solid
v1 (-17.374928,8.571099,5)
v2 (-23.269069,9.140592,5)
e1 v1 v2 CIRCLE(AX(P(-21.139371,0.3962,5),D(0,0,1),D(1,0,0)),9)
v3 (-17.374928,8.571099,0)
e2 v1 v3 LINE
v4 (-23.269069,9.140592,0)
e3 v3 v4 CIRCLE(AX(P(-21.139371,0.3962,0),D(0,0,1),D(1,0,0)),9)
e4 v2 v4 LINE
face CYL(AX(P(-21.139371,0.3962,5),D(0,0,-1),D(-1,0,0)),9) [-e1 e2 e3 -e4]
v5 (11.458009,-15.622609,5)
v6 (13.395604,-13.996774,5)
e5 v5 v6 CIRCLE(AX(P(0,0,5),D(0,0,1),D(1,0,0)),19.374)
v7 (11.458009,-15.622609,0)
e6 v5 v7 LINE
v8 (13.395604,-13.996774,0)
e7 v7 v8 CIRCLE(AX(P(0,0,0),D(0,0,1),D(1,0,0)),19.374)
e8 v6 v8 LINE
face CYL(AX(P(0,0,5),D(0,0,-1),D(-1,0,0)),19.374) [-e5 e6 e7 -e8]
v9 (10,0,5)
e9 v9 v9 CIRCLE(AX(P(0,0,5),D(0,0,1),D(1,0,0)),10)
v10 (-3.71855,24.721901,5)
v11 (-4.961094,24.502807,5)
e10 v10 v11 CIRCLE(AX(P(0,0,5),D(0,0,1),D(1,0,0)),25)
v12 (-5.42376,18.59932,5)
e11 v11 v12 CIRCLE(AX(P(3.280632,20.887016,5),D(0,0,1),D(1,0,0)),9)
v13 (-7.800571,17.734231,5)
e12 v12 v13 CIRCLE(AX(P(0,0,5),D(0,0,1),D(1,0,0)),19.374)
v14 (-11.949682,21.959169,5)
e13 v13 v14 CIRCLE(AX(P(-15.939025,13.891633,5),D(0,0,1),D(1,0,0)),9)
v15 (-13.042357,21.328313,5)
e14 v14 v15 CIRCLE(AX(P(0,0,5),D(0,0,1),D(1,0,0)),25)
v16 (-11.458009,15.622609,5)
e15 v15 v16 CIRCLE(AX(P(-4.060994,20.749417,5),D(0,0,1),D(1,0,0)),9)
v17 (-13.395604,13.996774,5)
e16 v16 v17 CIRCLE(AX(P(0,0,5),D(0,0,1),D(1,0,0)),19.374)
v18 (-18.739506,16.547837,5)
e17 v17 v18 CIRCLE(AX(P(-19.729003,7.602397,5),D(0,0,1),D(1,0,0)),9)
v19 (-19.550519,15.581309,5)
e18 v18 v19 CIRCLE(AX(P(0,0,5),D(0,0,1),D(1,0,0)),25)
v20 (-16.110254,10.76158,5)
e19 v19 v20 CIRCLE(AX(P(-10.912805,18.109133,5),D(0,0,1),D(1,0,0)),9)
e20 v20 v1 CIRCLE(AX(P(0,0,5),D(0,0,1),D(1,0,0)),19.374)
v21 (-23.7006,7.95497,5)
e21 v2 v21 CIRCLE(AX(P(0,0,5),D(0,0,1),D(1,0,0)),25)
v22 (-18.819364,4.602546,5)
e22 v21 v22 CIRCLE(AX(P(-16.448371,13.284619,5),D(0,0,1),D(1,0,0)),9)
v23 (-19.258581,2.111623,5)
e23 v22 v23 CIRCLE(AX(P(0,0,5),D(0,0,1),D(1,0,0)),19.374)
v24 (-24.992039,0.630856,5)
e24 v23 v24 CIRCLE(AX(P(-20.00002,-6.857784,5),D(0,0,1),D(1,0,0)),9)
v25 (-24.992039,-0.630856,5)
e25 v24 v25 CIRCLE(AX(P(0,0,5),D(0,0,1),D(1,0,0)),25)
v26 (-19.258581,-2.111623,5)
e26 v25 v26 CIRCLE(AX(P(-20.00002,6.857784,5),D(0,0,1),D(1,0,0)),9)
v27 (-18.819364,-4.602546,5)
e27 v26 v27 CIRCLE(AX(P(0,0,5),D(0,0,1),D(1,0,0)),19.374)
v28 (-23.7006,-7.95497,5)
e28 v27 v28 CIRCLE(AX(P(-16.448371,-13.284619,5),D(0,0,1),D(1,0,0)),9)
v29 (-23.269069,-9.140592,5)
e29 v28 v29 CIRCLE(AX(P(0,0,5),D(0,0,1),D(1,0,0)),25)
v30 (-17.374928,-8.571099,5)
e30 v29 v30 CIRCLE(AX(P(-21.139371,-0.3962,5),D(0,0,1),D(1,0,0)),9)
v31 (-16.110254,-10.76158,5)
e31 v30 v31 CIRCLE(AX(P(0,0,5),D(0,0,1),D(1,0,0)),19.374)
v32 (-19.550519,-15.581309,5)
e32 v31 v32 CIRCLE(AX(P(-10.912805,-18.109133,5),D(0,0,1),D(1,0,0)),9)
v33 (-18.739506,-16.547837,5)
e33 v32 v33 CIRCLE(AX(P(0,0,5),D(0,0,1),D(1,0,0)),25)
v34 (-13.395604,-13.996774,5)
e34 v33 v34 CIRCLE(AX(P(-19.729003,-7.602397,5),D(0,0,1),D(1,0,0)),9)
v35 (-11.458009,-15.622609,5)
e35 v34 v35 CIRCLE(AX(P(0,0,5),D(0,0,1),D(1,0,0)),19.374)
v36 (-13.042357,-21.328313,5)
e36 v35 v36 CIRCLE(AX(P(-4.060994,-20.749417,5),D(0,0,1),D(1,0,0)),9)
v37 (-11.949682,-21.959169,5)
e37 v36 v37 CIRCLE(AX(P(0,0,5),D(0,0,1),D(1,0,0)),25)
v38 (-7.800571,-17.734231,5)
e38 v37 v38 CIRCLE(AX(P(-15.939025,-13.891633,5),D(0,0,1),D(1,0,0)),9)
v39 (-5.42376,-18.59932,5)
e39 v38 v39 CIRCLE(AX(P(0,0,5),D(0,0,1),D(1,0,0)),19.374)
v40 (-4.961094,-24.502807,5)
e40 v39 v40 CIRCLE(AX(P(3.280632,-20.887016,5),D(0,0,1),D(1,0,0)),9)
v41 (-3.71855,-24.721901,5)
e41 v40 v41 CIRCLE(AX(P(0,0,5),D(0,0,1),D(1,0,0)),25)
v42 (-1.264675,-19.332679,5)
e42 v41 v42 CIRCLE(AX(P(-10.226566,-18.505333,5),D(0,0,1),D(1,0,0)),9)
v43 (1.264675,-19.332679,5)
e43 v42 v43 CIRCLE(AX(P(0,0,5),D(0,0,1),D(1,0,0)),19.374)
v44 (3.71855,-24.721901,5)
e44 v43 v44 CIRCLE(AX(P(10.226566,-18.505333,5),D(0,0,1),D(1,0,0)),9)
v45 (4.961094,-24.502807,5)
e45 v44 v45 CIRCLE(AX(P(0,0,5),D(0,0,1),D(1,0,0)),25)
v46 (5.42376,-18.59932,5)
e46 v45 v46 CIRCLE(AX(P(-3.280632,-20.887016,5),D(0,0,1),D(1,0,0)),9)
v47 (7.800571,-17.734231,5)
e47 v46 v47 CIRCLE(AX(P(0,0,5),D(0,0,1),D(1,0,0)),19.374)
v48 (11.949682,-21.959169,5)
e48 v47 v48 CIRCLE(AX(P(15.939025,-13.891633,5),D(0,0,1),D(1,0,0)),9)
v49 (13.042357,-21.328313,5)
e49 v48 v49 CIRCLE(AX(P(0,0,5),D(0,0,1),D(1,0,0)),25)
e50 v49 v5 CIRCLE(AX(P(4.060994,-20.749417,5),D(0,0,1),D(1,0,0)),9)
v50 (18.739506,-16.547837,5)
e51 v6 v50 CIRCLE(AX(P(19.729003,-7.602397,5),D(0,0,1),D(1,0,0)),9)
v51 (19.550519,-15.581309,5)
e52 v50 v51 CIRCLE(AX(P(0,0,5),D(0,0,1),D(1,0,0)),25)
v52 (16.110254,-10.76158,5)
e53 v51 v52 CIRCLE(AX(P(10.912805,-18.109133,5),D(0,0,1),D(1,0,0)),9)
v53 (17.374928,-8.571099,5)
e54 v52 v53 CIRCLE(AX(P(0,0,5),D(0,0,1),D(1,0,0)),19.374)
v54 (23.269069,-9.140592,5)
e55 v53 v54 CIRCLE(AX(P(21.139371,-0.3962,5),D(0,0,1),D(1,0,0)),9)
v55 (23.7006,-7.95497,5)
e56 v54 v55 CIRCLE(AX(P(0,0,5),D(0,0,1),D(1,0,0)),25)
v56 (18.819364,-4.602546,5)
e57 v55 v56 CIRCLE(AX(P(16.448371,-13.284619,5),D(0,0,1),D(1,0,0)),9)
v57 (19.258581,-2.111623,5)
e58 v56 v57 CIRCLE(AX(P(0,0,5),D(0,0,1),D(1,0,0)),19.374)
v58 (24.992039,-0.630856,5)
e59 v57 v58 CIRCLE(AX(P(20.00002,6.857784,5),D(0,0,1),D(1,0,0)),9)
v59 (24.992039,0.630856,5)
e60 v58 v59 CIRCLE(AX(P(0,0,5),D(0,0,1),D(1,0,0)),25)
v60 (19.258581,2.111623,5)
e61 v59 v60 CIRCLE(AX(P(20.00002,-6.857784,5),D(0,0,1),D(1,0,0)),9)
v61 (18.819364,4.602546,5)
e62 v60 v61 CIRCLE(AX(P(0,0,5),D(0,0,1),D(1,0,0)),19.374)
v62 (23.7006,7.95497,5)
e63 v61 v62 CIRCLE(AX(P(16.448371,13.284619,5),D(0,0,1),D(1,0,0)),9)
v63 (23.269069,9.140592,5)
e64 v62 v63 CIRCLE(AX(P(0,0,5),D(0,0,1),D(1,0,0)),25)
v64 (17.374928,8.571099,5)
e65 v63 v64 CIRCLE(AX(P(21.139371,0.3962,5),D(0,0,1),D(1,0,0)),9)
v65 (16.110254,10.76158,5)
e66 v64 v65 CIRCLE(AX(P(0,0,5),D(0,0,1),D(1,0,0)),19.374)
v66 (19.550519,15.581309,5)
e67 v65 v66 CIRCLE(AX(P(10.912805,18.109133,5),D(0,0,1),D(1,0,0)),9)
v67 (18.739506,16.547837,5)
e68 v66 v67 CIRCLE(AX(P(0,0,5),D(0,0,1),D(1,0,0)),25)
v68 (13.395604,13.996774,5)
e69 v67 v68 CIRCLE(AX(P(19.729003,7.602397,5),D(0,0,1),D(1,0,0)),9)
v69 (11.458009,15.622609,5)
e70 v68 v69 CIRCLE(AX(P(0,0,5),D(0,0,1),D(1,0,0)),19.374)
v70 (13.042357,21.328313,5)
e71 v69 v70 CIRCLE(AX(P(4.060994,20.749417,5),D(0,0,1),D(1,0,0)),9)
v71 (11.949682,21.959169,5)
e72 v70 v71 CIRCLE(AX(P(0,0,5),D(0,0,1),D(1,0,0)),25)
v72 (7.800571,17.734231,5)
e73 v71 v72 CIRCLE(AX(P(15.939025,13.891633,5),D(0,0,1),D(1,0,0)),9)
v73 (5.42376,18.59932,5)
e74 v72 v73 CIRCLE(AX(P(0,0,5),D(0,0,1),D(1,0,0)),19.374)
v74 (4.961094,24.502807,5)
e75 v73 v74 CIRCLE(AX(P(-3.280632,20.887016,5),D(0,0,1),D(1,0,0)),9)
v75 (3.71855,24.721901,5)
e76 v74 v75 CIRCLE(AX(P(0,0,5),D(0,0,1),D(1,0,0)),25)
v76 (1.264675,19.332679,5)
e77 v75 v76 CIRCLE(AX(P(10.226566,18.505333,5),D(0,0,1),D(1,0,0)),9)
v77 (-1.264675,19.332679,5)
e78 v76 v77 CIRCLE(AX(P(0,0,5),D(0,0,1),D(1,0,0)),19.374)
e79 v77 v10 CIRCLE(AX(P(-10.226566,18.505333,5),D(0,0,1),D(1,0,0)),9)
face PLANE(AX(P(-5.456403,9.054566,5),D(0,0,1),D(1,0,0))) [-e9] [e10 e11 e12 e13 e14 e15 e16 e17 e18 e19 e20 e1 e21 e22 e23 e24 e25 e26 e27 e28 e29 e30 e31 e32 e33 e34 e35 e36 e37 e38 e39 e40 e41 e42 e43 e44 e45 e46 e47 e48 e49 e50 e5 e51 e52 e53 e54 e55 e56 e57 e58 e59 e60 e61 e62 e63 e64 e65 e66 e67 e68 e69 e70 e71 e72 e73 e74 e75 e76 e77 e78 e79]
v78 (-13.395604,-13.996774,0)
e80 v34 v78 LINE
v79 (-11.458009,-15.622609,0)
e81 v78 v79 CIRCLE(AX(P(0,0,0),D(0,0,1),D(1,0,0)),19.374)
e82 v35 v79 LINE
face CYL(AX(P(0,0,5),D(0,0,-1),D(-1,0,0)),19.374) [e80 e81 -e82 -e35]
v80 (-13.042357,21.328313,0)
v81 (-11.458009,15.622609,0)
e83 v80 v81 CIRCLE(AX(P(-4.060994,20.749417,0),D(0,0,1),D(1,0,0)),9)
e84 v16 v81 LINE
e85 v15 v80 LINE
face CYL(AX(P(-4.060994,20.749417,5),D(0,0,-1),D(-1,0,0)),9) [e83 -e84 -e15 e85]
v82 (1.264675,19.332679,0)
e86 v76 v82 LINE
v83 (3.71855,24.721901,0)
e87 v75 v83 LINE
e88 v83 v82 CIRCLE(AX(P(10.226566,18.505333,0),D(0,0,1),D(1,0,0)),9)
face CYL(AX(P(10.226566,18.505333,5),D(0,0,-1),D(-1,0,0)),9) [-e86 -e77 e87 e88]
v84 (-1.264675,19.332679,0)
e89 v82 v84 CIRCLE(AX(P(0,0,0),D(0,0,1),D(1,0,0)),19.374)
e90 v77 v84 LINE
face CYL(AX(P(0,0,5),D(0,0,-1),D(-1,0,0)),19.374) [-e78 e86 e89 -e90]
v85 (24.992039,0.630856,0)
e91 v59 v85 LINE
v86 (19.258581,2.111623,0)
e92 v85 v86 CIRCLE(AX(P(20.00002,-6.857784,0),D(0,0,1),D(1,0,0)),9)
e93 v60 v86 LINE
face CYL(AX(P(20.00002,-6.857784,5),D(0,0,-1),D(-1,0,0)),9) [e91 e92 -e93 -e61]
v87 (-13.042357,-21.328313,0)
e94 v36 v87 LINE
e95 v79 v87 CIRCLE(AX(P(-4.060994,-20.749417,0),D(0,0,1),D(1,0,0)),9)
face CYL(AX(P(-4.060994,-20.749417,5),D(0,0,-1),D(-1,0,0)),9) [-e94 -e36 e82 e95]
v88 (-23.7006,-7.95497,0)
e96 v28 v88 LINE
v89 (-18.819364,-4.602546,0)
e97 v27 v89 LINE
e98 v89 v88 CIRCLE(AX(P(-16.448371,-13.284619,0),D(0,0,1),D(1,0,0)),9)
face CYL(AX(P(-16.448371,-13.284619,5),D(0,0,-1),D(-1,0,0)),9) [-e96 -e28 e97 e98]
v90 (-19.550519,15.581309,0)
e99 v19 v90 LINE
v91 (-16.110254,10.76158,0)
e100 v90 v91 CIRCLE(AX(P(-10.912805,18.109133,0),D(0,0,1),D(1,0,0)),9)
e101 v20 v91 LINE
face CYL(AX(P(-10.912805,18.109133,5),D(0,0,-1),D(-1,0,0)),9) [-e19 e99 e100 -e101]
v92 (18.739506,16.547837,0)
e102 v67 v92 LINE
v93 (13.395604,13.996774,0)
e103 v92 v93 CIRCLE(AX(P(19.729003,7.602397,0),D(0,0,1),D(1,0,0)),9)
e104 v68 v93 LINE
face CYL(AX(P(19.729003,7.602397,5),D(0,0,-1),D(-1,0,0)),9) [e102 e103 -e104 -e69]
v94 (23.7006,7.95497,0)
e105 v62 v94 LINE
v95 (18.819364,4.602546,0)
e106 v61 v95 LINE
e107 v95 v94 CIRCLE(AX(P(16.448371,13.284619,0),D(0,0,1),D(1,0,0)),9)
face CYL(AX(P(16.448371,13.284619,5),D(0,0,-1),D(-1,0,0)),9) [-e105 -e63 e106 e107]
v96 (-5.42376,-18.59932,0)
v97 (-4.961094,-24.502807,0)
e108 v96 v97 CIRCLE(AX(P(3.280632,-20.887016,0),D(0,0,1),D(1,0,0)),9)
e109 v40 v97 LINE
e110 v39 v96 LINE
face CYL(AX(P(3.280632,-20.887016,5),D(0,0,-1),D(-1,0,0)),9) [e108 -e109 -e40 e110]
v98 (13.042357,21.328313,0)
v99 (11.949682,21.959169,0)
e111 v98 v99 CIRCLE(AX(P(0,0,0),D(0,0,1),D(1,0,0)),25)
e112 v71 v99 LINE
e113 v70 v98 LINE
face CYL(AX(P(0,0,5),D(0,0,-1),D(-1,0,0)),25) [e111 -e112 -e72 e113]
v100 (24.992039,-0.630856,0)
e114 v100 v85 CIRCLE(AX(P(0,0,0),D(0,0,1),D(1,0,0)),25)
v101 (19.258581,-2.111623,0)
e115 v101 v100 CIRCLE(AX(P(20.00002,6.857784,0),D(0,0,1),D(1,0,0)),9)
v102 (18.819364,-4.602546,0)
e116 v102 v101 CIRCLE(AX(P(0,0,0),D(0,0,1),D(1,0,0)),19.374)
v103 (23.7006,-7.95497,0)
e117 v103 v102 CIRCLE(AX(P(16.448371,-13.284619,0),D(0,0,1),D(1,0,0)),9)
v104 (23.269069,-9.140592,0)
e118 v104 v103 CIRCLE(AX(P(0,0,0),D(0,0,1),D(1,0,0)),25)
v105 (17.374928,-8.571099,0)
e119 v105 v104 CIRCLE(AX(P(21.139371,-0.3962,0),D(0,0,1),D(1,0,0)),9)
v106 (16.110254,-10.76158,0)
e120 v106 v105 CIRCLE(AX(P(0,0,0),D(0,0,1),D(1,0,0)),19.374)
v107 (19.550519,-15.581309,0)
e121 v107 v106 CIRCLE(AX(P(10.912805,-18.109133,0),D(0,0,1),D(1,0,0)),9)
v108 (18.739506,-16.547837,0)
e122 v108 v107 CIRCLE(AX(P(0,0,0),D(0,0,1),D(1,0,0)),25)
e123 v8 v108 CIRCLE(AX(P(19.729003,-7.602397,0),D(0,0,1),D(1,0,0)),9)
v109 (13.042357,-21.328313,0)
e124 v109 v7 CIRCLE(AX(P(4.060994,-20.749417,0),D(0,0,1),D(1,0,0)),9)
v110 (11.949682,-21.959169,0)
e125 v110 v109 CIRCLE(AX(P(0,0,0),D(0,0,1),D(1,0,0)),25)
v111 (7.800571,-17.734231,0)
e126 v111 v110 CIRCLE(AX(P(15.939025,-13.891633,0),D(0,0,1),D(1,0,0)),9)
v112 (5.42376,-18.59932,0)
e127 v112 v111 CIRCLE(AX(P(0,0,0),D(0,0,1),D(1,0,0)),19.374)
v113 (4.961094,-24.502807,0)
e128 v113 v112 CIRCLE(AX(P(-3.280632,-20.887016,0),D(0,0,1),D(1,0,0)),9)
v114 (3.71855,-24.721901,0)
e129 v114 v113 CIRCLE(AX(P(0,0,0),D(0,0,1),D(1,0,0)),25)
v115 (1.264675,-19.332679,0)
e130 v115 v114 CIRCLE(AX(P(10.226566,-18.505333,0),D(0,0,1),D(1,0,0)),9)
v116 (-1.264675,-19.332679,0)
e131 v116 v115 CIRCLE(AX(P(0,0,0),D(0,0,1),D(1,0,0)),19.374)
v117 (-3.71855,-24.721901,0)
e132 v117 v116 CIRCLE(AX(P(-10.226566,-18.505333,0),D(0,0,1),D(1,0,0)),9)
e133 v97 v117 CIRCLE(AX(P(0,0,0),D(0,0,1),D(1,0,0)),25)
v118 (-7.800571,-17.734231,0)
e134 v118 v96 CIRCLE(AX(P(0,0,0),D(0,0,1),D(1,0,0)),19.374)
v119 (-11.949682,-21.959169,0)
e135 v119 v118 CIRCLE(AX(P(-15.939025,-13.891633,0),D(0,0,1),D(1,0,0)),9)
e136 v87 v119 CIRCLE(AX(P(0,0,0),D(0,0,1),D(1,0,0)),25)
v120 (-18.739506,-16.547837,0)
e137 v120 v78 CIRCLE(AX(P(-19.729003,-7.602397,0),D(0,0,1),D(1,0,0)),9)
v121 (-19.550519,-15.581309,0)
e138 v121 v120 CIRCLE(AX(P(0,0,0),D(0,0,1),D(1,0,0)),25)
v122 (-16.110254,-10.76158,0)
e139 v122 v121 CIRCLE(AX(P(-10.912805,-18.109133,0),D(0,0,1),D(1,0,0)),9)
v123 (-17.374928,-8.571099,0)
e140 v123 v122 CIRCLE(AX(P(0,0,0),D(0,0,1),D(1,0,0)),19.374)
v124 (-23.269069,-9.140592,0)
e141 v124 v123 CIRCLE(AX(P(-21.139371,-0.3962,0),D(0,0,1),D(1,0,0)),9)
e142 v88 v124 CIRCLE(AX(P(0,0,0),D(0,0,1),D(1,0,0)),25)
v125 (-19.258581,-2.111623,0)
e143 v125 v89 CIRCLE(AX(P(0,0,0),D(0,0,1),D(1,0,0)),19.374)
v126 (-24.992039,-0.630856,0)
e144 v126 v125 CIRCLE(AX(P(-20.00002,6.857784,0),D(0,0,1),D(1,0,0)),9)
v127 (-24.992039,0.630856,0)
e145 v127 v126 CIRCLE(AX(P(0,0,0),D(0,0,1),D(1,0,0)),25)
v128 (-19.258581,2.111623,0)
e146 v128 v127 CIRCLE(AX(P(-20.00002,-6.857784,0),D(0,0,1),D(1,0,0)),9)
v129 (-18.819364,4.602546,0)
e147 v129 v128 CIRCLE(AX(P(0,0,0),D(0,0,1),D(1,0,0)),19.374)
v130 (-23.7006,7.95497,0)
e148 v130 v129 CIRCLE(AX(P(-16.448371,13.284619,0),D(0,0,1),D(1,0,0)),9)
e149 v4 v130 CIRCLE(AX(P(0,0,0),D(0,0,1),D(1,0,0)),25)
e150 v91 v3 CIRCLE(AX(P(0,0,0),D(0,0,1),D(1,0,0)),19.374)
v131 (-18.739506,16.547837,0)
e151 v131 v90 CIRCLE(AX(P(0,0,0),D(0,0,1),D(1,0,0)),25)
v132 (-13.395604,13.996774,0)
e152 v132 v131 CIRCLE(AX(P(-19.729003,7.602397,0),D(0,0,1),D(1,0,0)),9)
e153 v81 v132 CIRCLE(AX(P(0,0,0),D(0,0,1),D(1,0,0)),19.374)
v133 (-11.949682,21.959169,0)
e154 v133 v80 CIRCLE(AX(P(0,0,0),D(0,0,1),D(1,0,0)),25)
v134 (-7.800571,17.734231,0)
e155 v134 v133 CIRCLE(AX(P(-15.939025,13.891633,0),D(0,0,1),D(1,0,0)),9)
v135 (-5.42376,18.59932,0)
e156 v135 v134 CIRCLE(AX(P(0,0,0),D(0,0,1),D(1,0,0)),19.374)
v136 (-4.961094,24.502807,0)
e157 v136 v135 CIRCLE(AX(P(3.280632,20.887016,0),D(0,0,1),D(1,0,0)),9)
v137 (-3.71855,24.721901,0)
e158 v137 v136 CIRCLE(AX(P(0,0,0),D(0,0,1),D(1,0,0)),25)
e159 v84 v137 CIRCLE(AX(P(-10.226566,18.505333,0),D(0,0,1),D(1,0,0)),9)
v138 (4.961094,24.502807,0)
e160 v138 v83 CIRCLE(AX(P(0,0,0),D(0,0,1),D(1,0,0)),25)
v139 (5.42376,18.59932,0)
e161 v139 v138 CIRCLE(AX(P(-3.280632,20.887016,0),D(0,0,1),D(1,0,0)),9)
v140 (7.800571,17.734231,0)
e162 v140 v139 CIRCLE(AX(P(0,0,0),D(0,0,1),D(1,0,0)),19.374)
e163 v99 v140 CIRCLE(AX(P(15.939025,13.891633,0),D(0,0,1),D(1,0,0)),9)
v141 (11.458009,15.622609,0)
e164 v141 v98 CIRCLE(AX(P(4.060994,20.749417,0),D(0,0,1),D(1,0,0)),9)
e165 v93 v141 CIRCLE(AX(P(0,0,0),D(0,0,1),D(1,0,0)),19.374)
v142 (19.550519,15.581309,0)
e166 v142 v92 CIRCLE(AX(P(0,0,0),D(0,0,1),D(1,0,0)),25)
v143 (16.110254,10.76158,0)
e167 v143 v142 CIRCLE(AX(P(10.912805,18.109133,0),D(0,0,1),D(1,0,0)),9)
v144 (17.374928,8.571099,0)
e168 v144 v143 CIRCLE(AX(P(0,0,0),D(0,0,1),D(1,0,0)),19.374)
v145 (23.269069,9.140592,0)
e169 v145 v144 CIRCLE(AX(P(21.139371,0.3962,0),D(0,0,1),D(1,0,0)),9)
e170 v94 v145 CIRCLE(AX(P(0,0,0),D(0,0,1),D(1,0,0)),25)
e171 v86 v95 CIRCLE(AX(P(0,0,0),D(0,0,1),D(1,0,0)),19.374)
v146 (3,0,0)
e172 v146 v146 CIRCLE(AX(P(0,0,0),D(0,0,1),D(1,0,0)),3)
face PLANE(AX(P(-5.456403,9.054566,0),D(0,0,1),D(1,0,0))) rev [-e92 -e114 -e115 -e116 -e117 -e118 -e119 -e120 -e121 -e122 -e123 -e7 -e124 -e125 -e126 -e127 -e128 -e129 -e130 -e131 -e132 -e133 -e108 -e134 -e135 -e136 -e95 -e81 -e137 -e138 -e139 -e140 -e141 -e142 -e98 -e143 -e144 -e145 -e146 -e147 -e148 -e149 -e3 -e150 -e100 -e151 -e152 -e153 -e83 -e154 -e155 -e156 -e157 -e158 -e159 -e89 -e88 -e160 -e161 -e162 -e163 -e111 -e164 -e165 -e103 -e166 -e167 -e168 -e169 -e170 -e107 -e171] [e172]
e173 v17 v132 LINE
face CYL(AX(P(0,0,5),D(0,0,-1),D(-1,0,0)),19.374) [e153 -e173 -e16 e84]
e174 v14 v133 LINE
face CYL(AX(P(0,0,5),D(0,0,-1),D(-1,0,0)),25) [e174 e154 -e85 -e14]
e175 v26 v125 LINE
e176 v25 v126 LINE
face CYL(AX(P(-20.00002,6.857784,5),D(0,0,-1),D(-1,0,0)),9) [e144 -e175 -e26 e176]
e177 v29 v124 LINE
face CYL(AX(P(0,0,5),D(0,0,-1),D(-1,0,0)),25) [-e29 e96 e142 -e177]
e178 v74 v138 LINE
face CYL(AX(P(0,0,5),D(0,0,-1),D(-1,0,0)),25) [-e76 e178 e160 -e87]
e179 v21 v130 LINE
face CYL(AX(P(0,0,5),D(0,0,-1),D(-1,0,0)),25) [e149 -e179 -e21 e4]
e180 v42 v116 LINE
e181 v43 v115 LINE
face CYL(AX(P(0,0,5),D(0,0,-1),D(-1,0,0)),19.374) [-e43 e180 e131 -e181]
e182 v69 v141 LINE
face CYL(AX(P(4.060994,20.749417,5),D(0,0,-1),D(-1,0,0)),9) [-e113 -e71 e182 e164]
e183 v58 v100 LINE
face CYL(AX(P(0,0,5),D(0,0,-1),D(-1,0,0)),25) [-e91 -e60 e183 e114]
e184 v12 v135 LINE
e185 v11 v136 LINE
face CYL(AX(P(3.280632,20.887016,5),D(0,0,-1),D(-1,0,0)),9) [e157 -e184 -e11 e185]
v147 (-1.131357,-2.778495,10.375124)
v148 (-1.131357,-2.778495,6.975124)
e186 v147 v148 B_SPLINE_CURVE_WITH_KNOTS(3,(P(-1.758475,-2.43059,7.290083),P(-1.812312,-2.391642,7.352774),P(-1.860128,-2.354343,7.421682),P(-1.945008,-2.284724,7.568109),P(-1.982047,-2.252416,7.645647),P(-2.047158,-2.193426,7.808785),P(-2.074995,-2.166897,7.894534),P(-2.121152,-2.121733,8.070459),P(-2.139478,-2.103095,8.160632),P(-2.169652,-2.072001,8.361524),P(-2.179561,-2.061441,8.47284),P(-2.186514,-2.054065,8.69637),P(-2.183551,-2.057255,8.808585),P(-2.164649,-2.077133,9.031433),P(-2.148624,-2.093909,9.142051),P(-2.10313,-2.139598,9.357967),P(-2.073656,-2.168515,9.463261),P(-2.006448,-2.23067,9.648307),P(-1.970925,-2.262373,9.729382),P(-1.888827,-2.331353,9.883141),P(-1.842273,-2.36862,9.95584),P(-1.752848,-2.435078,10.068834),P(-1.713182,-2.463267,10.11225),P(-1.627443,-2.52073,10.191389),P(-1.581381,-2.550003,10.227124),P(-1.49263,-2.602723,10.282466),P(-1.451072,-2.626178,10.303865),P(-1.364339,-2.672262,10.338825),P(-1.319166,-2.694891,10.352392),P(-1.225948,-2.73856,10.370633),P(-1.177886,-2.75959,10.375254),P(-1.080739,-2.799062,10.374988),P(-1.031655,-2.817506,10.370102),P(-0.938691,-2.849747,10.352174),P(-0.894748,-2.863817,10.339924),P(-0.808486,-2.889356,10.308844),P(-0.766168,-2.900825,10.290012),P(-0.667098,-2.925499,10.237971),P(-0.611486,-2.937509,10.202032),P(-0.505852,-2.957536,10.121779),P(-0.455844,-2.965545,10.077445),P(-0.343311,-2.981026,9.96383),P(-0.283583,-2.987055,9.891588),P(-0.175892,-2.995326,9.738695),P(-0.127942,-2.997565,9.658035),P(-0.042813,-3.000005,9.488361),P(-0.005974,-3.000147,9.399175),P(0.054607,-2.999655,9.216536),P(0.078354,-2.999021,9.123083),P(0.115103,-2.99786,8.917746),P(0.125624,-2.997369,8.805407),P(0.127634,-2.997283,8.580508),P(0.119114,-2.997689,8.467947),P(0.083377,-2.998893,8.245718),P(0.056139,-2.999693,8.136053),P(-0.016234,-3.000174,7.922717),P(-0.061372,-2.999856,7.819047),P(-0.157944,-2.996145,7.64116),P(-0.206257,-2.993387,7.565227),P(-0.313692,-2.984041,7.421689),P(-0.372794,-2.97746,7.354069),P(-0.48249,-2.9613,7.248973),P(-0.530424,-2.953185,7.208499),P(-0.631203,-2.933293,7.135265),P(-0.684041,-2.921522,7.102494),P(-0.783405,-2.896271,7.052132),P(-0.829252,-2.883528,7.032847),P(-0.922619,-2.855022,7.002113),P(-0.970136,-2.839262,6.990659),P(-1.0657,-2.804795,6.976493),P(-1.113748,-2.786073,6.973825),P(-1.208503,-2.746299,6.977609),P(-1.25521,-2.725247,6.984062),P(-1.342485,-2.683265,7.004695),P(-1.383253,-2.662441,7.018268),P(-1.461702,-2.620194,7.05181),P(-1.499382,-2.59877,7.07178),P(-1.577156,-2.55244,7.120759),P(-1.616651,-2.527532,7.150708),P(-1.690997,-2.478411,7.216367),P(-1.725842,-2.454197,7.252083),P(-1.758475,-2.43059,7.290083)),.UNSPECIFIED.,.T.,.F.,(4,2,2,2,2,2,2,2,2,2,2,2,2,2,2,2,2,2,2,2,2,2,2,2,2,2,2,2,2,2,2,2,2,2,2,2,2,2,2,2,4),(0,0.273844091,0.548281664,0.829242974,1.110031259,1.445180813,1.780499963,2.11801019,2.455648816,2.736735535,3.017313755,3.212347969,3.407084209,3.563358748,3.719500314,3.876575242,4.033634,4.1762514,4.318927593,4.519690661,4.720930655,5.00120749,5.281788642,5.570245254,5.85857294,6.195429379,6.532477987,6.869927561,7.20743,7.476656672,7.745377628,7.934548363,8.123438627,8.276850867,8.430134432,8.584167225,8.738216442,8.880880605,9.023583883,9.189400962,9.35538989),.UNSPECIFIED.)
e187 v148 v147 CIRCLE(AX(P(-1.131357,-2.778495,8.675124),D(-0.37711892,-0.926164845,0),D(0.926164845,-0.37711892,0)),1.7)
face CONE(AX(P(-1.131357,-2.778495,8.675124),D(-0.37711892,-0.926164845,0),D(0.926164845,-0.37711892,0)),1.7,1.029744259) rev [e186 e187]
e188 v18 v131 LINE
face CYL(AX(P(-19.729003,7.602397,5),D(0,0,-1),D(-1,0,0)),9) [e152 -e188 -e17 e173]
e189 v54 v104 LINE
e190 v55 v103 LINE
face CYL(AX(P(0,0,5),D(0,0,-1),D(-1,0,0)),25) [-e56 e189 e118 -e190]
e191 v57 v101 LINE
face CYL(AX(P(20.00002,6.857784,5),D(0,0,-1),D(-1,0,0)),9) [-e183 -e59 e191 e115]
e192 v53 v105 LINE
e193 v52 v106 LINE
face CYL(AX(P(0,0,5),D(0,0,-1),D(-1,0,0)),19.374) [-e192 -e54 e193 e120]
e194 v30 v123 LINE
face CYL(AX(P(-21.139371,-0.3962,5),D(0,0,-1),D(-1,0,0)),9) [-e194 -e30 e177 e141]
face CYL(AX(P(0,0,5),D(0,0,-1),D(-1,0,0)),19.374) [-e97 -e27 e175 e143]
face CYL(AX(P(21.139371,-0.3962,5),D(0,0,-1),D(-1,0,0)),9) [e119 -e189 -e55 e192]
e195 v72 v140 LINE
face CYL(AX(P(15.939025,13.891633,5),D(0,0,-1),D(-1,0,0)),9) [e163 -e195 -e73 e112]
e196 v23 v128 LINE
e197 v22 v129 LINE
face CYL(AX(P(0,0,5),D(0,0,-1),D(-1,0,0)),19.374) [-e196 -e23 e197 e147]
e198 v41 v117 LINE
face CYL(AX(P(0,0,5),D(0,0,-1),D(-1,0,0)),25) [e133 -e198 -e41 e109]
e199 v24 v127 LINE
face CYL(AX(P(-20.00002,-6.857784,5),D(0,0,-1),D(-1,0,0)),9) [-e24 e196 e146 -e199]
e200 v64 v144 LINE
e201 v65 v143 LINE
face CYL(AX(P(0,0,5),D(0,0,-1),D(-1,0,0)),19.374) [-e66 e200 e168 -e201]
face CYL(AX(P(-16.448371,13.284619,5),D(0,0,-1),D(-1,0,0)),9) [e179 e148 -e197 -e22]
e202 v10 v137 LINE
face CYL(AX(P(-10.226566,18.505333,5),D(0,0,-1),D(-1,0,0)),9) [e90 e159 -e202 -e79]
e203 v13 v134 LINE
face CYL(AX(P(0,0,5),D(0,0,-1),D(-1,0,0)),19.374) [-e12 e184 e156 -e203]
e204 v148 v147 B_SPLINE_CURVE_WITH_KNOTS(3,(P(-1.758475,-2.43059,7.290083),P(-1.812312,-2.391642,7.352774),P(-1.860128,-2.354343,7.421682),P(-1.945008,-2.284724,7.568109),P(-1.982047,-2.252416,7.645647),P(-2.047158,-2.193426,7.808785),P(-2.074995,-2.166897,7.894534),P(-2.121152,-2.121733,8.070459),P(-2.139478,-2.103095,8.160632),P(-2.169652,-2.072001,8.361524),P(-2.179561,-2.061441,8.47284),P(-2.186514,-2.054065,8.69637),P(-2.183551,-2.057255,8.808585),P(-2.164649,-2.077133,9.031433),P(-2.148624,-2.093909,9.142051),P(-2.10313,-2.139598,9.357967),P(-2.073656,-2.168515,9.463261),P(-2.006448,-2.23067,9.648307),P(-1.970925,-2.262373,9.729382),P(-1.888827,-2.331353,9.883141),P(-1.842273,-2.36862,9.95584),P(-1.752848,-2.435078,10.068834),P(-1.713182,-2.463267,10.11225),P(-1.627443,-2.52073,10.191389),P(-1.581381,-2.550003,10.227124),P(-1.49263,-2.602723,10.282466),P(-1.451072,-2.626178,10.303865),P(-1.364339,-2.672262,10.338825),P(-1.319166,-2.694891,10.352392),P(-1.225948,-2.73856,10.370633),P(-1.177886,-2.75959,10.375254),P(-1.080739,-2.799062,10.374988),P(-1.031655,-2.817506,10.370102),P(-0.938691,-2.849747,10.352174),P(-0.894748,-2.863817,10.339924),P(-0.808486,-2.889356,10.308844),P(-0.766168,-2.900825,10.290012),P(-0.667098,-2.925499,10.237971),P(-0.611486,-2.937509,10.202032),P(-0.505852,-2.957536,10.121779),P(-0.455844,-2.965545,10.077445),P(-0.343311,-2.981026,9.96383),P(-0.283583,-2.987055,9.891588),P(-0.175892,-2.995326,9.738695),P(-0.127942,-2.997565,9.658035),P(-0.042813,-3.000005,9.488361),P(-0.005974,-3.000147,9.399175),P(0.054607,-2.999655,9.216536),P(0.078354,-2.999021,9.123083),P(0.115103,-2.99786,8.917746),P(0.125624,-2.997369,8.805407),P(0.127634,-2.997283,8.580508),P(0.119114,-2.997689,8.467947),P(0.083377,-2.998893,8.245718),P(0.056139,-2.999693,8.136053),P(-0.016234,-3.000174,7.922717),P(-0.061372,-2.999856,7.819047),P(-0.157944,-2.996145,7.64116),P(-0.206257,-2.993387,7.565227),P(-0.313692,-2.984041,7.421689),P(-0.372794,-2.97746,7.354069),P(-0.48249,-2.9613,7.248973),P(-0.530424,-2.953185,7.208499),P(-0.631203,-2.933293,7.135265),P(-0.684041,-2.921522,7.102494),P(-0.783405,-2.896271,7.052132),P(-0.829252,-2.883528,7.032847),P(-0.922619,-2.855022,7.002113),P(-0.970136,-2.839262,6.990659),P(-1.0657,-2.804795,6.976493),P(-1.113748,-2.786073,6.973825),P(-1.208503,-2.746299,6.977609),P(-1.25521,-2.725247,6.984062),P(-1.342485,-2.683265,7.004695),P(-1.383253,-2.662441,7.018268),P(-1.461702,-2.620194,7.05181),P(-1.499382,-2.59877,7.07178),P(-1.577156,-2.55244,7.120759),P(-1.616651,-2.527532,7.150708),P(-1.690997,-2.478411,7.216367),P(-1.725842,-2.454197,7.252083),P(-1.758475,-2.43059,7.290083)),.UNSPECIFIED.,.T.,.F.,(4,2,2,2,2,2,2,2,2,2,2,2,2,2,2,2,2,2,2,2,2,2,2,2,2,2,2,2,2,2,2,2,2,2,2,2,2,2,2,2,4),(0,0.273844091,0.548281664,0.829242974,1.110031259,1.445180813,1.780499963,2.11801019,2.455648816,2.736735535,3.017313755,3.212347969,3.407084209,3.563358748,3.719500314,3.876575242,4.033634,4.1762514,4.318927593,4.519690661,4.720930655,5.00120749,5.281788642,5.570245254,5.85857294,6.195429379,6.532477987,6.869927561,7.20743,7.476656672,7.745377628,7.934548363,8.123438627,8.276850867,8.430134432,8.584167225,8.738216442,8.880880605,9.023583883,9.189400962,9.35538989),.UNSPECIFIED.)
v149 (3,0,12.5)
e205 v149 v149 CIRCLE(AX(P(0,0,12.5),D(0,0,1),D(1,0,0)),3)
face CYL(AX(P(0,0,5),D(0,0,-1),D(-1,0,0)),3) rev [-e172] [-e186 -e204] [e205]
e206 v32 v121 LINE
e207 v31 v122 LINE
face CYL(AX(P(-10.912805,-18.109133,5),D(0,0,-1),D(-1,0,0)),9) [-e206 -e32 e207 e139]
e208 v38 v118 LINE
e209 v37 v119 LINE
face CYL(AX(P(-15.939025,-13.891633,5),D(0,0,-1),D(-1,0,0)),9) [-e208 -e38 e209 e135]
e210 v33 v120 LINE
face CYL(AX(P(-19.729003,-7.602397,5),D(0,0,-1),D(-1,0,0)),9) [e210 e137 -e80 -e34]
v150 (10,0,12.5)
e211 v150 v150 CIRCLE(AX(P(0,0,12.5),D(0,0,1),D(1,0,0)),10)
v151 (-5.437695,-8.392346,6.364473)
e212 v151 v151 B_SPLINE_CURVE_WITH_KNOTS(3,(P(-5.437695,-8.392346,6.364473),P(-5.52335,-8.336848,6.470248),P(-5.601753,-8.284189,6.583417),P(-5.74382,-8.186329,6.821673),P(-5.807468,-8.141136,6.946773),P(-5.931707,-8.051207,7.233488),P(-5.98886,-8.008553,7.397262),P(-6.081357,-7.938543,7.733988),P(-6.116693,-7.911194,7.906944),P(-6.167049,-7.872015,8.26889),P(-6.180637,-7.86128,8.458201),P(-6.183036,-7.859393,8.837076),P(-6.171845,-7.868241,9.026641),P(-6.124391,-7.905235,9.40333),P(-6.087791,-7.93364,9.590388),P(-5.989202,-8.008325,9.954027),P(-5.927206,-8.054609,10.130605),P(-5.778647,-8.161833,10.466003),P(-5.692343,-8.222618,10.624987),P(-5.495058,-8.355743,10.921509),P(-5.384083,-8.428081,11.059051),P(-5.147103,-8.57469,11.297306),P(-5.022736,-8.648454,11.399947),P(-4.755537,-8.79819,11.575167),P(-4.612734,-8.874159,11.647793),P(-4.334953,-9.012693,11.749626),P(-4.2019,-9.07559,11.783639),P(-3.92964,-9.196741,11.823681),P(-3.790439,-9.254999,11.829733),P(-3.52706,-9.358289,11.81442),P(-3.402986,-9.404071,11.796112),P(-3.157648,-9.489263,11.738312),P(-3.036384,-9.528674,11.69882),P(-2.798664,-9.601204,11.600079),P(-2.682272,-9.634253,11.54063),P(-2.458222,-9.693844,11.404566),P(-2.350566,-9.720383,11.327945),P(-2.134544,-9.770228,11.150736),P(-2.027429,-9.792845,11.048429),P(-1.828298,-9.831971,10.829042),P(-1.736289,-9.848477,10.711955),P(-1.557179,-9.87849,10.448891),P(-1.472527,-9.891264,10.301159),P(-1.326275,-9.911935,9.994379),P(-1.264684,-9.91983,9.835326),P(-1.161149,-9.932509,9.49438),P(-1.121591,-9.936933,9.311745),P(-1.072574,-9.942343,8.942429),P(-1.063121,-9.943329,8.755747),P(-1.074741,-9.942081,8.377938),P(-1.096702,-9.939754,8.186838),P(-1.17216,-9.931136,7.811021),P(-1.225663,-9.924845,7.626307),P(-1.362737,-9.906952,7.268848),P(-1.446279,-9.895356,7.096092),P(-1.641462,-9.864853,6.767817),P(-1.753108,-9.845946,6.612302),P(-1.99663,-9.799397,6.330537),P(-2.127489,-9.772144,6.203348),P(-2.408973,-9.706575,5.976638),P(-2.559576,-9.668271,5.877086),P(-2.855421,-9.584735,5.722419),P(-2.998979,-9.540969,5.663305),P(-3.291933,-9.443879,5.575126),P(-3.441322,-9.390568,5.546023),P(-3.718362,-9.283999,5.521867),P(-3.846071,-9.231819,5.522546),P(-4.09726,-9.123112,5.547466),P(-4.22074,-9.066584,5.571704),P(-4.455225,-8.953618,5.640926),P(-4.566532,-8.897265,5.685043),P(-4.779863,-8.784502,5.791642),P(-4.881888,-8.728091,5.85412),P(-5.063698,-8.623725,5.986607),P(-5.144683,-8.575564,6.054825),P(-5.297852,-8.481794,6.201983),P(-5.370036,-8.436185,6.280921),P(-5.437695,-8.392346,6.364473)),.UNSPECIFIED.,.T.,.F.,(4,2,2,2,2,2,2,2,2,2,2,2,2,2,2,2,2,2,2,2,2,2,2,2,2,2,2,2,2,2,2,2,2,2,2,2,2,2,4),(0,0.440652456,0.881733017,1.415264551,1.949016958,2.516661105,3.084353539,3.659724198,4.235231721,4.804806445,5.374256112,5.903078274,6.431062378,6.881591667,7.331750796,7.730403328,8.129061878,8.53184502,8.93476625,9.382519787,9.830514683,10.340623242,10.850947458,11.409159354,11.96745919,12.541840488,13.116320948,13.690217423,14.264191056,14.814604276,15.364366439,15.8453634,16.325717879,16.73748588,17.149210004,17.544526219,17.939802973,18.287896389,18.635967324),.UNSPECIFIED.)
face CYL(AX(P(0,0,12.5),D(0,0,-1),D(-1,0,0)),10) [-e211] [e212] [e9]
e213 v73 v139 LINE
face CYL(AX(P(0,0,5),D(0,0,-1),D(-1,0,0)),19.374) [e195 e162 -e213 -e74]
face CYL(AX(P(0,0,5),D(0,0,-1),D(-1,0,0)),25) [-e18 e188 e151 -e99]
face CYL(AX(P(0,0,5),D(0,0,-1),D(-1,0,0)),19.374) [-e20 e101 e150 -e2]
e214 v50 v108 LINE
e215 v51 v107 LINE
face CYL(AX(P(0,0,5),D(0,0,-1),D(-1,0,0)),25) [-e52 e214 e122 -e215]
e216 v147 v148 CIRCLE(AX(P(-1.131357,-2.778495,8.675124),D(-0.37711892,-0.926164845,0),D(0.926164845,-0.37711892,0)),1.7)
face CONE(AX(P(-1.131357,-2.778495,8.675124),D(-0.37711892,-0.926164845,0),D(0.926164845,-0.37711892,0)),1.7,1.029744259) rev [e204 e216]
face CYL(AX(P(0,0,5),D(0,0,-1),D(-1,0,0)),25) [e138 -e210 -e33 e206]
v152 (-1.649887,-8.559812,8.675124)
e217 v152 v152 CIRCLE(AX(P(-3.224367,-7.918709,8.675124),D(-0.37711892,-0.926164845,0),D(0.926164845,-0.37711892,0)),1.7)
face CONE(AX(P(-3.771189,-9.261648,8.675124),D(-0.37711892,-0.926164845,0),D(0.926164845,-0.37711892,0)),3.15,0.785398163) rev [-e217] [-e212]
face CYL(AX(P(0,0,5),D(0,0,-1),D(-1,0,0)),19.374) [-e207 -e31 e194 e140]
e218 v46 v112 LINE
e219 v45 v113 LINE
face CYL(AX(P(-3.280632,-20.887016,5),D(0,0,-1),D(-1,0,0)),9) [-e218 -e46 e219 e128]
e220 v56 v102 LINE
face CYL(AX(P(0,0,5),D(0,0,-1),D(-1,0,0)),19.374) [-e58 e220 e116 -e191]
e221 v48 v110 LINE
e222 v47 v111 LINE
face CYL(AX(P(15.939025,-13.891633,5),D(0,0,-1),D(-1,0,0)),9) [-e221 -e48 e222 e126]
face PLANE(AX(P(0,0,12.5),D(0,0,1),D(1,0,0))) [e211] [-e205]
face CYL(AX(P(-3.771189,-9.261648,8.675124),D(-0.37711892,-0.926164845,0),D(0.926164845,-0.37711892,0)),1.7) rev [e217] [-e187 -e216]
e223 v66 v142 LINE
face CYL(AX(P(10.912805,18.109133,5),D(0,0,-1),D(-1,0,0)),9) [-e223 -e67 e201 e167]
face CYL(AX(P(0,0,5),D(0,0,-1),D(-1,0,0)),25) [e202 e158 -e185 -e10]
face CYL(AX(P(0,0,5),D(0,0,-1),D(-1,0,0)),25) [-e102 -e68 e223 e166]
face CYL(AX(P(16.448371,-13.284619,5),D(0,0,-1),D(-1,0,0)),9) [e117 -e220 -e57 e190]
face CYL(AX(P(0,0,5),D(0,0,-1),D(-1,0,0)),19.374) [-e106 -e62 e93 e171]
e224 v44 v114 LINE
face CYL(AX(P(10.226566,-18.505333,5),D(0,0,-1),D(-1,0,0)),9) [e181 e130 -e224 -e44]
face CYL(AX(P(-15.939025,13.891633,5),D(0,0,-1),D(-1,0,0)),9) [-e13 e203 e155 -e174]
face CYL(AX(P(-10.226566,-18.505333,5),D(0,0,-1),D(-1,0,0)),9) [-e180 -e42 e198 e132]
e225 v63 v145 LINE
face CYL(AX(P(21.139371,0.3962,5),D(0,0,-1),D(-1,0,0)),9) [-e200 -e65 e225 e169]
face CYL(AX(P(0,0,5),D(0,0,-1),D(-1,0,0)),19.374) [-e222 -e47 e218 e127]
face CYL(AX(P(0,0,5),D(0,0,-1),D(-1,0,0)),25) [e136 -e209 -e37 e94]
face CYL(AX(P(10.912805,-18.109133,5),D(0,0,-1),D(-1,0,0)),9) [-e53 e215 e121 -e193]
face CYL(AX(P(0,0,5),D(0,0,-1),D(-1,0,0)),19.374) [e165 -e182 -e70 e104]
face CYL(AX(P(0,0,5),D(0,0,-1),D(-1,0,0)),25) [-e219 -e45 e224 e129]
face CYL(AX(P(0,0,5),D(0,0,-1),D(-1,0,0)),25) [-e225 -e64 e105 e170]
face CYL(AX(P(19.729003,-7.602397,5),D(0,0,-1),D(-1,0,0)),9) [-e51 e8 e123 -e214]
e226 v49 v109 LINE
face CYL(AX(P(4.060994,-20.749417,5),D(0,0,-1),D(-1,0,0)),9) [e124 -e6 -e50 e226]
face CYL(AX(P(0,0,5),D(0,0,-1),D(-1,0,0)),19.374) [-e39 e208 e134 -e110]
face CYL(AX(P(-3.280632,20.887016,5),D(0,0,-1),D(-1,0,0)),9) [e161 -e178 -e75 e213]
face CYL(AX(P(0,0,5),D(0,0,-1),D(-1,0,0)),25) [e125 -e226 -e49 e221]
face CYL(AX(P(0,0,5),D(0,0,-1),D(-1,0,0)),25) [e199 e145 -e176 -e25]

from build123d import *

# Parameters (mm, degrees)
SKETCH1_R           = 3
BOSS_EXTRUDE2_DEPTH = 5
SKETCH2_R           = 10
SKETCH2_R_2         = 3
BOSS_EXTRUDE3_DEPTH = 7.5


# Read off the part's stored shape, not the designer's step: CSK for M3 Flat Head Machine Screw1
with BuildPart() as part:
    # Sketch1 → Boss-Extrude2 (new body)
    with BuildSketch(Plane.XY):
        with BuildLine():
            ThreePointArc((-19.550519413, 15.581309017), (-18.238129642, 12.880402273), (-16.110253623, 10.761580005))
            ThreePointArc((-16.110253623, 10.761580005), (-16.778376173, 9.687), (-17.374928481, 8.571098896))
            ThreePointArc((-17.374928481, 8.571098896), (-20.2738204, 9.354482451), (-23.269069139, 9.14059196))
            ThreePointArc((-23.269069139, 9.14059196), (-23.49231552, 8.550503583), (-23.700600368, 7.954969654))
            ThreePointArc((-23.700600368, 7.954969654), (-21.543592873, 5.865811255), (-18.819363584, 4.602546066))
            ThreePointArc((-18.819363584, 4.602546066), (-19.079665407, 3.364259794), (-19.258580553, 2.111622855))
            ThreePointArc((-19.258580553, 2.111622855), (-22.250580854, 1.856283171), (-24.992039135, 0.630856452))
            ThreePointArc((-24.992039135, 0.630856452), (-25, 0), (-24.992039135, -0.630856452))
            ThreePointArc((-24.992039135, -0.630856452), (-22.250580854, -1.856283171), (-19.258580553, -2.111622855))
            ThreePointArc((-19.258580553, -2.111622855), (-19.079665407, -3.364259794), (-18.819363584, -4.602546066))
            ThreePointArc((-18.819363584, -4.602546066), (-21.543592873, -5.865811255), (-23.700600368, -7.954969654))
            ThreePointArc((-23.700600368, -7.954969654), (-23.49231552, -8.550503583), (-23.269069139, -9.14059196))
            ThreePointArc((-23.269069139, -9.14059196), (-20.2738204, -9.354482451), (-17.374928481, -8.571098896))
            ThreePointArc((-17.374928481, -8.571098896), (-16.778376173, -9.687), (-16.110253623, -10.761580005))
            ThreePointArc((-16.110253623, -10.761580005), (-18.238129642, -12.880402273), (-19.550519413, -15.581309017))
            ThreePointArc((-19.550519413, -15.581309017), (-19.151111078, -16.069690242), (-18.739505991, -16.547837177))
            ThreePointArc((-18.739505991, -16.547837177), (-15.851737997, -15.724393089), (-13.395603607, -13.996773914))
            ThreePointArc((-13.395603607, -13.996773914), (-12.45336715, -14.841345041), (-11.458009312, -15.622608572))
            ThreePointArc((-11.458009312, -15.622608572), (-12.73287881, -18.341426683), (-13.042357282, -21.328312557))
            ThreePointArc((-13.042357282, -21.328312557), (-12.5, -21.650635095), (-11.949681854, -21.95916901))
            ThreePointArc((-11.949681854, -21.95916901), (-9.517702044, -20.197709854), (-7.800571241, -17.734231427))
            ThreePointArc((-7.800571241, -17.734231427), (-6.626298257, -18.205604835), (-5.423759977, -18.59931998))
            ThreePointArc((-5.423759977, -18.59931998), (-5.691854876, -21.590204344), (-4.961094377, -24.502806831))
            ThreePointArc((-4.961094377, -24.502806831), (-4.341204442, -24.620193825), (-3.718549727, -24.721900977))
            ThreePointArc((-3.718549727, -24.721900977), (-2.035690758, -22.234884724), (-1.264674858, -19.332678901))
            ThreePointArc((-1.264674858, -19.332678901), (0, -19.374), (1.264674858, -19.332678901))
            ThreePointArc((1.264674858, -19.332678901), (2.035690758, -22.234884724), (3.718549727, -24.721900977))
            ThreePointArc((3.718549727, -24.721900977), (4.341204442, -24.620193825), (4.961094377, -24.502806831))
            ThreePointArc((4.961094377, -24.502806831), (5.691854876, -21.590204344), (5.423759977, -18.59931998))
            ThreePointArc((5.423759977, -18.59931998), (6.626298257, -18.205604835), (7.800571241, -17.734231427))
            ThreePointArc((7.800571241, -17.734231427), (9.517702044, -20.197709854), (11.949681854, -21.95916901))
            ThreePointArc((11.949681854, -21.95916901), (12.5, -21.650635095), (13.042357282, -21.328312557))
            ThreePointArc((13.042357282, -21.328312557), (12.73287881, -18.341426683), (11.458009312, -15.622608572))
            ThreePointArc((11.458009312, -15.622608572), (12.45336715, -14.841345041), (13.395603607, -13.996773914))
            ThreePointArc((13.395603607, -13.996773914), (15.851737997, -15.724393089), (18.739505991, -16.547837177))
            ThreePointArc((18.739505991, -16.547837177), (19.151111078, -16.069690242), (19.550519413, -15.581309017))
            ThreePointArc((19.550519413, -15.581309017), (18.238129642, -12.880402273), (16.110253623, -10.761580005))
            ThreePointArc((16.110253623, -10.761580005), (16.778376173, -9.687), (17.374928481, -8.571098896))
            ThreePointArc((17.374928481, -8.571098896), (20.2738204, -9.354482451), (23.269069139, -9.14059196))
            ThreePointArc((23.269069139, -9.14059196), (23.49231552, -8.550503583), (23.700600368, -7.954969654))
            ThreePointArc((23.700600368, -7.954969654), (21.543592873, -5.865811255), (18.819363584, -4.602546066))
            ThreePointArc((18.819363584, -4.602546066), (19.079665407, -3.364259794), (19.258580553, -2.111622855))
            ThreePointArc((19.258580553, -2.111622855), (22.250580854, -1.856283171), (24.992039135, -0.630856452))
            ThreePointArc((24.992039135, -0.630856452), (25, 0), (24.992039135, 0.630856452))
            ThreePointArc((24.992039135, 0.630856452), (22.250580854, 1.856283171), (19.258580553, 2.111622855))
            ThreePointArc((19.258580553, 2.111622855), (19.079665407, 3.364259794), (18.819363584, 4.602546066))
            ThreePointArc((18.819363584, 4.602546066), (21.543592873, 5.865811255), (23.700600368, 7.954969654))
            ThreePointArc((23.700600368, 7.954969654), (23.49231552, 8.550503583), (23.269069139, 9.14059196))
            ThreePointArc((23.269069139, 9.14059196), (20.2738204, 9.354482451), (17.374928481, 8.571098896))
            ThreePointArc((17.374928481, 8.571098896), (16.778376173, 9.687), (16.110253623, 10.761580005))
            ThreePointArc((16.110253623, 10.761580005), (18.238129642, 12.880402273), (19.550519413, 15.581309017))
            ThreePointArc((19.550519413, 15.581309017), (19.151111078, 16.069690242), (18.739505991, 16.547837177))
            ThreePointArc((18.739505991, 16.547837177), (15.851737997, 15.724393089), (13.395603607, 13.996773914))
            ThreePointArc((13.395603607, 13.996773914), (12.45336715, 14.841345041), (11.458009312, 15.622608572))
            ThreePointArc((11.458009312, 15.622608572), (12.73287881, 18.341426683), (13.042357282, 21.328312557))
            ThreePointArc((13.042357282, 21.328312557), (12.5, 21.650635095), (11.949681854, 21.95916901))
            ThreePointArc((11.949681854, 21.95916901), (9.517702044, 20.197709854), (7.800571241, 17.734231427))
            ThreePointArc((7.800571241, 17.734231427), (6.626298257, 18.205604835), (5.423759977, 18.59931998))
            ThreePointArc((5.423759977, 18.59931998), (5.691854876, 21.590204344), (4.961094377, 24.502806831))
            ThreePointArc((4.961094377, 24.502806831), (4.341204442, 24.620193825), (3.718549727, 24.721900977))
            ThreePointArc((3.718549727, 24.721900977), (2.035690758, 22.234884724), (1.264674858, 19.332678901))
            ThreePointArc((1.264674858, 19.332678901), (0, 19.374), (-1.264674858, 19.332678901))
            ThreePointArc((-1.264674858, 19.332678901), (-2.035690758, 22.234884724), (-3.718549727, 24.721900977))
            ThreePointArc((-3.718549727, 24.721900977), (-4.341204442, 24.620193825), (-4.961094377, 24.502806831))
            ThreePointArc((-4.961094377, 24.502806831), (-5.691854876, 21.590204344), (-5.423759977, 18.59931998))
            ThreePointArc((-5.423759977, 18.59931998), (-6.626298257, 18.205604835), (-7.800571241, 17.734231427))
            ThreePointArc((-7.800571241, 17.734231427), (-9.517702044, 20.197709854), (-11.949681854, 21.95916901))
            ThreePointArc((-11.949681854, 21.95916901), (-12.5, 21.650635095), (-13.042357282, 21.328312557))
            ThreePointArc((-13.042357282, 21.328312557), (-12.73287881, 18.341426683), (-11.458009312, 15.622608572))
            ThreePointArc((-11.458009312, 15.622608572), (-12.45336715, 14.841345041), (-13.395603607, 13.996773914))
            ThreePointArc((-13.395603607, 13.996773914), (-15.851737997, 15.724393089), (-18.739505991, 16.547837177))
            ThreePointArc((-18.739505991, 16.547837177), (-19.151111078, 16.069690242), (-19.550519413, 15.581309017))
        make_face()
        Circle(SKETCH1_R, mode=Mode.SUBTRACT)
    extrude(amount=BOSS_EXTRUDE2_DEPTH)

    # Sketch2 → Boss-Extrude3 (add)
    with BuildSketch(Plane.XY.offset(5)):
        Circle(SKETCH2_R)
        Circle(SKETCH2_R_2, mode=Mode.SUBTRACT)
    extrude(amount=BOSS_EXTRUDE3_DEPTH)

    # CSK for M3 Flat Head Machine Screw1 outl → CSK for M3 Flat Head Machine Screw1 (revolve, cut)
    with BuildSketch(Plane(origin=(0, 0, 8.675124241), x_dir=(0.9261648448832729, -0.37711892037173506, 0), z_dir=(0, 0, 1))):
        Polygon((3.150067458, -10.000067458), (1.7, -8.55), (1.7, -3), (1.247536555, -2.728132535), (0, -2.728132535), (0, -10.000067458), align=None)
    revolve(axis=Axis((0, 0, 8.675124241), (0.37711892037173506, 0.9261648448832729, 0)), mode=Mode.SUBTRACT)


solid = part.part
